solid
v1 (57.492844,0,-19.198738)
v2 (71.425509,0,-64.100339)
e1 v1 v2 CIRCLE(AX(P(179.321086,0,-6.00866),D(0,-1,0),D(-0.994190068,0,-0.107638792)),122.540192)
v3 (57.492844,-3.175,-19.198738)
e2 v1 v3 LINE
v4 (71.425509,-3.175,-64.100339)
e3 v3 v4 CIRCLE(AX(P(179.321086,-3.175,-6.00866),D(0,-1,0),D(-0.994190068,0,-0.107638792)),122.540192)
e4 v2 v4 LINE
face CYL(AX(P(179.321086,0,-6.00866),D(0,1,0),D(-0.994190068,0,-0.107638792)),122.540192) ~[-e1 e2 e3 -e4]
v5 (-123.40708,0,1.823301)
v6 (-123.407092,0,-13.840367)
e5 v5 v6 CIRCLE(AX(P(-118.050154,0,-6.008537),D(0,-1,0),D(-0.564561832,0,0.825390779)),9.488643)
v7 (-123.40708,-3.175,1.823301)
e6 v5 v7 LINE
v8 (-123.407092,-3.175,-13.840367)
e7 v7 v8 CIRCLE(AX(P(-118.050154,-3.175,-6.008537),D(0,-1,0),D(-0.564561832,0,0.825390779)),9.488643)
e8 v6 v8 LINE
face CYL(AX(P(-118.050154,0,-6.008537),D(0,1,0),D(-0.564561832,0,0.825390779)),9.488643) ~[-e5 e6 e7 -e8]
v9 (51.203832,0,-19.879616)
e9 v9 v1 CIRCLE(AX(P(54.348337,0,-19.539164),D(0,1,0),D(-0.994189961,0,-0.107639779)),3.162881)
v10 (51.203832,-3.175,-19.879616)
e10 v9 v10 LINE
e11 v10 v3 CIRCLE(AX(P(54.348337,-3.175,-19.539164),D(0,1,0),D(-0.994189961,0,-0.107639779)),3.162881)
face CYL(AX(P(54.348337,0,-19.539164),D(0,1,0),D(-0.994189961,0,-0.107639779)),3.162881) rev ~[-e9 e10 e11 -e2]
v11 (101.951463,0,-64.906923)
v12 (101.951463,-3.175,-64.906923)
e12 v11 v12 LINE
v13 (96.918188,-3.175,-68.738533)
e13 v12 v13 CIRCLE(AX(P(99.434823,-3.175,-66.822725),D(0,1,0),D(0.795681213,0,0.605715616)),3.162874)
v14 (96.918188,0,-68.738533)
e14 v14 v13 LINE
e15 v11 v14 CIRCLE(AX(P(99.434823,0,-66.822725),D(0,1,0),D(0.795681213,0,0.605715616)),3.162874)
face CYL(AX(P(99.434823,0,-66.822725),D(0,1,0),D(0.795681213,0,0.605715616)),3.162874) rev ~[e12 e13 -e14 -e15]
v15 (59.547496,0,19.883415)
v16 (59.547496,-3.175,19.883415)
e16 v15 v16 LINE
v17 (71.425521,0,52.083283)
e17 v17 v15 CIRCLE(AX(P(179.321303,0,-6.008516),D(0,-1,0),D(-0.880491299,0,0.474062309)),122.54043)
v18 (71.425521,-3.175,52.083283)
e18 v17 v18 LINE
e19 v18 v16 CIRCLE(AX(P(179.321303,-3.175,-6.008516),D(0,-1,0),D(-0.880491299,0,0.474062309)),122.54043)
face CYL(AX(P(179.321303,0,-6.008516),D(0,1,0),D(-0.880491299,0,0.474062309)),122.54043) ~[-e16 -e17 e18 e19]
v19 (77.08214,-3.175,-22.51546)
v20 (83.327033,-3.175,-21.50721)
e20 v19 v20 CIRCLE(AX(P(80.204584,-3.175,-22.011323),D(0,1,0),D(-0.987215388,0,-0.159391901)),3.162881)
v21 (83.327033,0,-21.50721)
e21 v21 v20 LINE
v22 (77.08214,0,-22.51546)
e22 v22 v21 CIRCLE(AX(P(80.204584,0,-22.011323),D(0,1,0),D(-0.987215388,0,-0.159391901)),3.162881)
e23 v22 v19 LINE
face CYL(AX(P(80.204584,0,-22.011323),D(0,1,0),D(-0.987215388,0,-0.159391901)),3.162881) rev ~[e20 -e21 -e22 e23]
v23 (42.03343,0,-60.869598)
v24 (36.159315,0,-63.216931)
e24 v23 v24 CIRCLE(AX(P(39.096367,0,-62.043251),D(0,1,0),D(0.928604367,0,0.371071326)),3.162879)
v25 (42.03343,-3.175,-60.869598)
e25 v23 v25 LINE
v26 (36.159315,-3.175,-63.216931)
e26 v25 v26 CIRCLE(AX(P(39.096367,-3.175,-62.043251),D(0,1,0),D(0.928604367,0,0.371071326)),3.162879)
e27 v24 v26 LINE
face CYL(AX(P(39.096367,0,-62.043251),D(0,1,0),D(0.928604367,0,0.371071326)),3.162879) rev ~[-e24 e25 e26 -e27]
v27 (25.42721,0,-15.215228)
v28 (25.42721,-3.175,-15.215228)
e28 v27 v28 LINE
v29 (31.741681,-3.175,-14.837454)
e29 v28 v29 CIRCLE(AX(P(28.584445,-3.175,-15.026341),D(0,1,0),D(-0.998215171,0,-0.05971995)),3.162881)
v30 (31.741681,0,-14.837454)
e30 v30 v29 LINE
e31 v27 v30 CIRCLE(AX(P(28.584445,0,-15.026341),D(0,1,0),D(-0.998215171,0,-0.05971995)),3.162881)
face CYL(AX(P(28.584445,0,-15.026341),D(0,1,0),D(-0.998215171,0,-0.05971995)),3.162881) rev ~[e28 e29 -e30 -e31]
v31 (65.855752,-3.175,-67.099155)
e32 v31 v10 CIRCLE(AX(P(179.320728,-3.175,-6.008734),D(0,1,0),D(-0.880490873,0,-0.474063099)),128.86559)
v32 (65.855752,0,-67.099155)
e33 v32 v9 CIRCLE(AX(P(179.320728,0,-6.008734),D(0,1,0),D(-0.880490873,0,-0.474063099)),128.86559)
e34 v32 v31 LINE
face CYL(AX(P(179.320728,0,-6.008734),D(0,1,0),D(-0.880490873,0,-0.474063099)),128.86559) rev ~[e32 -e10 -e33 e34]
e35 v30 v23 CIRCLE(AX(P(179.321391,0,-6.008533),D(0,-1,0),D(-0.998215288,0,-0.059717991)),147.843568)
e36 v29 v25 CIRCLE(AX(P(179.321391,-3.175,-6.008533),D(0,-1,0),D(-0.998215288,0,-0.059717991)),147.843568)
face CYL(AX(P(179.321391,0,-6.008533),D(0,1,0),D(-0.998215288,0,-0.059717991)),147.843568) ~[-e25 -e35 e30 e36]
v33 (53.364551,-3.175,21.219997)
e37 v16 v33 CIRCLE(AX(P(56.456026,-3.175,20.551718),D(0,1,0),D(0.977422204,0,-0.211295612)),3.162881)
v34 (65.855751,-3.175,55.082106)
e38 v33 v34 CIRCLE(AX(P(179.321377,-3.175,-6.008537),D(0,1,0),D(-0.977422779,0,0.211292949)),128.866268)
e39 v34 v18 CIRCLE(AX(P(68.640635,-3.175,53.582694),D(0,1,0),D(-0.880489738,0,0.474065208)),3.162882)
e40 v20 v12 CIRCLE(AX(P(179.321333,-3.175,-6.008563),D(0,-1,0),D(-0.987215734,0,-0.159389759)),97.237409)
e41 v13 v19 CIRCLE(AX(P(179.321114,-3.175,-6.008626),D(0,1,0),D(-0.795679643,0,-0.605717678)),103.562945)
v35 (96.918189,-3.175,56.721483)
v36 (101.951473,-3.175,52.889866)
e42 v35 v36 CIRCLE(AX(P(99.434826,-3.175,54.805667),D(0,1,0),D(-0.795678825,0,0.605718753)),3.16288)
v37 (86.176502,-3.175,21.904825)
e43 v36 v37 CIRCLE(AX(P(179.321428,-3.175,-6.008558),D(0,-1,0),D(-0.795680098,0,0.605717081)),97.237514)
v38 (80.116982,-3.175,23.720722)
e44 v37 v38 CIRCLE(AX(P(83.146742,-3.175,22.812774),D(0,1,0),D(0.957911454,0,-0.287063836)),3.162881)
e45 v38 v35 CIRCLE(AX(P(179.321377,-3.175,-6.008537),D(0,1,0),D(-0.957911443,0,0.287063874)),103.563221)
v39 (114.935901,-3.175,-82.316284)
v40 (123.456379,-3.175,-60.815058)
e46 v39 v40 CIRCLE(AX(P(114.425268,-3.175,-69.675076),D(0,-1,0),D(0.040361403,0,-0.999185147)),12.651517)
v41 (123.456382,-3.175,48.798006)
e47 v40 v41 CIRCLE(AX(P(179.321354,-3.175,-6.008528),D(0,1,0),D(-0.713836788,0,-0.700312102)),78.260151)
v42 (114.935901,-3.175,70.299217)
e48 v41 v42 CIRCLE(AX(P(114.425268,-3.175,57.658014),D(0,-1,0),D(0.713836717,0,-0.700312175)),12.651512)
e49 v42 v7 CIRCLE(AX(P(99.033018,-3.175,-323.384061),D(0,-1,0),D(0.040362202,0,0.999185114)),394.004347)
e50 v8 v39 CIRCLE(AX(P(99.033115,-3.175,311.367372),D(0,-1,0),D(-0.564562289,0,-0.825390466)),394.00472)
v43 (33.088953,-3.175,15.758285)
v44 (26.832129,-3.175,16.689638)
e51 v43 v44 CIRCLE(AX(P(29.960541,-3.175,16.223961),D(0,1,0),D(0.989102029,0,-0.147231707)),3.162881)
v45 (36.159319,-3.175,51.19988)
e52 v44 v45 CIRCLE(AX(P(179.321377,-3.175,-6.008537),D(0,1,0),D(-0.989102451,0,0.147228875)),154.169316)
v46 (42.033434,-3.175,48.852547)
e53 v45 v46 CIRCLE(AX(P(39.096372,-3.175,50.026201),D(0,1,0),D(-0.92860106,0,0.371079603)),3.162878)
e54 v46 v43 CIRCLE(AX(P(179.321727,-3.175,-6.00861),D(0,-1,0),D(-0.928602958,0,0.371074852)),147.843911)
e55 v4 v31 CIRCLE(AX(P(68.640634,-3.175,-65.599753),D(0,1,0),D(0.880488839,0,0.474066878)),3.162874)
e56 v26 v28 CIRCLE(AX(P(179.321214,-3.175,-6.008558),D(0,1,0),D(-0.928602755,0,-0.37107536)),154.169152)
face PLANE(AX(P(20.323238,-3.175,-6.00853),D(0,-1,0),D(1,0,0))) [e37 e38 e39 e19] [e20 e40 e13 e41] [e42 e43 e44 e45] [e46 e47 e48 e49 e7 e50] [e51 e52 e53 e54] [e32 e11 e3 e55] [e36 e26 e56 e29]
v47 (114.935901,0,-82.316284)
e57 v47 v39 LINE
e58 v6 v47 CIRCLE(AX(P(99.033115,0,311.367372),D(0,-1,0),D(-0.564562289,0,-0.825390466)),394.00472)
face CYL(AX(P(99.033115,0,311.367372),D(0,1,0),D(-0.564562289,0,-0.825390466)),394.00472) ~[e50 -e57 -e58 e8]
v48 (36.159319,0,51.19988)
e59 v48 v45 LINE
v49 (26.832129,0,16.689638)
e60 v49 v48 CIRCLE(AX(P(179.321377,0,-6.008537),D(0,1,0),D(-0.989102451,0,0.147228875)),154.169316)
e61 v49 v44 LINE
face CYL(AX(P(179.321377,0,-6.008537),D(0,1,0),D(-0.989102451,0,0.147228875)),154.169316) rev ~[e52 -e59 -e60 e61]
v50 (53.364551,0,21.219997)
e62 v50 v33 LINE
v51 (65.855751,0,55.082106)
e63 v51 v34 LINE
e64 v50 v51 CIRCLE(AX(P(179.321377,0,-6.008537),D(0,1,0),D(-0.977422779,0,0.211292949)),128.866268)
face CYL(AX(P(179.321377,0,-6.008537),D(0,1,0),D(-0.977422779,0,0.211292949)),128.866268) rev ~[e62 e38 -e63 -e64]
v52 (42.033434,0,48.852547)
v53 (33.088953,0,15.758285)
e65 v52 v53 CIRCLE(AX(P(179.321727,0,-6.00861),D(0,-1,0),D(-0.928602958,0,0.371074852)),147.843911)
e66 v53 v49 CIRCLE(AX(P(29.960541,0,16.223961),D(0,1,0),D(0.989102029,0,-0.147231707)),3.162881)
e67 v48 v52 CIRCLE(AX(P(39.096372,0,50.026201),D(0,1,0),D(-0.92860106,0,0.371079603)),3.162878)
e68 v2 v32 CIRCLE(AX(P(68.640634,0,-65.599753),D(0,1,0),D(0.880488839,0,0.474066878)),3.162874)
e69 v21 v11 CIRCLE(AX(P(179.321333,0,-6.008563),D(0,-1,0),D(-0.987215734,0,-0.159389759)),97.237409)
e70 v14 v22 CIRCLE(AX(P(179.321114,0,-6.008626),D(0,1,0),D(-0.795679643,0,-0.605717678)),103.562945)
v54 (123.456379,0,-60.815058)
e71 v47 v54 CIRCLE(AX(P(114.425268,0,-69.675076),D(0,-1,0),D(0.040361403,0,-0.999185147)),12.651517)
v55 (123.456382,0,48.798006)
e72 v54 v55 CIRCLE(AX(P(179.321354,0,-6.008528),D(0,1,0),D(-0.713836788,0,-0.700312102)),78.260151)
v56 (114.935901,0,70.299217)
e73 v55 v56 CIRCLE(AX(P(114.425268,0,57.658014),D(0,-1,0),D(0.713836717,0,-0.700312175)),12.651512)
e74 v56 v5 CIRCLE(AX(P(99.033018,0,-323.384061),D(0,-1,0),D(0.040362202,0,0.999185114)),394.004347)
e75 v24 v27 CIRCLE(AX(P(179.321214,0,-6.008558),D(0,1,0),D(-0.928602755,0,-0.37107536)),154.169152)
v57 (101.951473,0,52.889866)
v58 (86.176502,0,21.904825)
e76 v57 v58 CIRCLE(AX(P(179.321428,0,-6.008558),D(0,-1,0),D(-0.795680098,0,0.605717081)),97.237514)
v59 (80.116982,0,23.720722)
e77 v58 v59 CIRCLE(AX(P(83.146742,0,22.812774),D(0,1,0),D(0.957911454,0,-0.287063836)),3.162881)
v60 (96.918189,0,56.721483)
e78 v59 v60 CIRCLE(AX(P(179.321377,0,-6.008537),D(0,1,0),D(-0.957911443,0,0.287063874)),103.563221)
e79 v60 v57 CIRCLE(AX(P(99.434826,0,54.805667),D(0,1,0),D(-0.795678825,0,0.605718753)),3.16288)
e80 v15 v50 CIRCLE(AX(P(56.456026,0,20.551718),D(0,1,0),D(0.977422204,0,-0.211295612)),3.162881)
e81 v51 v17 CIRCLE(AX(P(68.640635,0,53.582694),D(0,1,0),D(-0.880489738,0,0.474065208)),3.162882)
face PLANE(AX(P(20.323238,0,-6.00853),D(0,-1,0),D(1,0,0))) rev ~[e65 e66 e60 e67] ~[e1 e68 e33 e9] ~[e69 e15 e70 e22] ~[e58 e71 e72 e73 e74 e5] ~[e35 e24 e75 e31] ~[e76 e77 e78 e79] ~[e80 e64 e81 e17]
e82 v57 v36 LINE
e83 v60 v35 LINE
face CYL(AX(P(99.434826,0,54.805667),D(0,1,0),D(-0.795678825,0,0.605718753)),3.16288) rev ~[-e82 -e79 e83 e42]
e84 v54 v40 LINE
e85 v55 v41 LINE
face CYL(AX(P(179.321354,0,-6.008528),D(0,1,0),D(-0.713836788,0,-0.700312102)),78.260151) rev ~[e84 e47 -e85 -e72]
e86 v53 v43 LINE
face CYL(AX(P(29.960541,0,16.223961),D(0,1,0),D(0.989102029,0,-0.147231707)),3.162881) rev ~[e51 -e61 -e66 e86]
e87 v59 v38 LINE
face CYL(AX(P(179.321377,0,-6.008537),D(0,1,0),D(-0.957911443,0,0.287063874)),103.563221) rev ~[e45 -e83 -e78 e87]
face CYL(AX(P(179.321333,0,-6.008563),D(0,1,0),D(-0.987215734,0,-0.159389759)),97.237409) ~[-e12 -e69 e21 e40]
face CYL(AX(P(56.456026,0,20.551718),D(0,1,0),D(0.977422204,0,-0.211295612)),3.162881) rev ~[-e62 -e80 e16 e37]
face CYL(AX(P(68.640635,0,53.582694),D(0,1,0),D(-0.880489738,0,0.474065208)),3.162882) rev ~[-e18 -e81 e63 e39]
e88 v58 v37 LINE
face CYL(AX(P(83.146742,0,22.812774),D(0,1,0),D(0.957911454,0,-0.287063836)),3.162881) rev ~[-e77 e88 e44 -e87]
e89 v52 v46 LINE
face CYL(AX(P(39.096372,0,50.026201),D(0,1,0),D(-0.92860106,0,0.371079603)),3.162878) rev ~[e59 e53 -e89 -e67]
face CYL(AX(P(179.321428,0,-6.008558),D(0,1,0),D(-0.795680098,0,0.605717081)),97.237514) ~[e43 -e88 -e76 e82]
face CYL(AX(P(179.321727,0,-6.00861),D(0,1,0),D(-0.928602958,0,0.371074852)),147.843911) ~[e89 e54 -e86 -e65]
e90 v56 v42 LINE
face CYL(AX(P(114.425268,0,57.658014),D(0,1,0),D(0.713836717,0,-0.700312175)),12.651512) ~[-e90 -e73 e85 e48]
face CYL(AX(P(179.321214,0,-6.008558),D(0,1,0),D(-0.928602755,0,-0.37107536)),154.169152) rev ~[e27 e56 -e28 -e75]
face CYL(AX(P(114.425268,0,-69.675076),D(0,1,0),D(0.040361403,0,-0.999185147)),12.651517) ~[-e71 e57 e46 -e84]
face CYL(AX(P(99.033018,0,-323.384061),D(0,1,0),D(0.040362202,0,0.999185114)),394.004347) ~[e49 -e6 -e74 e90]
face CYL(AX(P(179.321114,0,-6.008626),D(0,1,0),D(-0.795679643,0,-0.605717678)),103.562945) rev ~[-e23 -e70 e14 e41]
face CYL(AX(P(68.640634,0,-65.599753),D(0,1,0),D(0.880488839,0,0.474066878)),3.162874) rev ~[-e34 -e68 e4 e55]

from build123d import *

# Parameters (mm, degrees)
F1_DEPTH = 3.175


# Not quite as in the source:
# - ends of sketch curves that miss each other by under 0.0002 mm in the source are joined


with BuildPart() as f1:
    # F0 (on Front) → F1 (new body)
    with BuildSketch(Plane.XZ):
        with BuildLine():
            ThreePointArc((-123.4070797919, 1.8233010265), (-127.5387969828, -6.0085300089), (-123.4070915827, -13.8403672647))
            ThreePointArc((-123.4070915827, -13.8403672647), (-9.7633198011, -67.3185862363), (114.9359014402, -82.3162835053))
            ThreePointArc((114.9359014402, -82.3162835053), (126.1869378761, -74.3359779231), (123.456379114, -60.815058194))
            ThreePointArc((123.456379114, -60.815058194), (101.0612030172, -6.0085281204), (123.4563821883, 48.798006178))
            ThreePointArc((123.4563821883, 48.798006178), (126.1869343608, 62.3189124907), (114.9359007509, 70.2992174423))
            ThreePointArc((114.9359007509, 70.2992174423), (-9.7633198011, 55.3015372363), (-123.4070797919, 1.8233010265))
        make_face()
        with BuildLine():
            ThreePointArc((77.0821397385, -22.5154604101), (79.7004591586, -18.8888761314), (83.3270330978, -21.5072098724))
            ThreePointArc((83.3270330978, -21.5072098724), (89.9643653266, -44.3549576844), (101.9514625839, -64.9069229437))
            ThreePointArc((101.9514625839, -64.9069229437), (101.3506333254, -69.3393586044), (96.9181875419, -68.7385326678))
            ThreePointArc((96.9181875419, -68.7385326678), (84.1512609661, -46.8495678563), (77.0821397385, -22.5154604101))
        make_face(mode=Mode.SUBTRACT)
        with BuildLine():
            ThreePointArc((25.4272095012, -15.2152278243), (28.3955581041, -11.8691050411), (31.7416808873, -14.837453644))
            ThreePointArc((31.7416808873, -14.837453644), (35.0399400748, -38.2666108744), (42.033430024, -60.8695978255))
            ThreePointArc((42.033430024, -60.8695978255), (40.2700359641, -64.9803081743), (36.1593147519, -63.2169312407))
            ThreePointArc((36.1593147519, -63.2169312407), (28.8665917441, -39.6468400601), (25.4272095012, -15.2152278243))
        make_face(mode=Mode.SUBTRACT)
        with BuildLine():
            ThreePointArc((51.2038323174, -19.8796162989), (54.0078974535, -16.3946587115), (57.4928438898, -19.1987377064))
            ThreePointArc((57.4928438898, -19.1987377064), (62.2856351867, -42.3239729178), (71.4255090517, -64.1003387977))
            ThreePointArc((71.4255090517, -64.1003387977), (70.1400475431, -68.384628042), (65.855751892, -67.099154634))
            ThreePointArc((65.855751892, -67.099154634), (56.24403894, -44.1986400904), (51.2038323174, -19.8796162989))
        make_face(mode=Mode.SUBTRACT)
        with BuildLine():
            ThreePointArc((26.8321292417, 16.6896378099), (30.4920693109, 34.2160200507), (36.1593192267, 51.1998804526))
            ThreePointArc((36.1593192267, 51.1998804526), (40.2700359641, 52.9632591743), (42.0334342681, 48.8525471295))
            ThreePointArc((42.0334342681, 48.8525471295), (36.5987212677, 32.5655461507), (33.0889530651, 15.7582851057))
            ThreePointArc((33.0889530651, 15.7582851057), (29.4948750618, 13.0955480188), (26.8321292417, 16.6896378099))
        make_face(mode=Mode.SUBTRACT)
        with BuildLine():
            ThreePointArc((53.3645508696, 21.2199967221), (58.4187785321, 38.5905299983), (65.8557505543, 55.0821063543))
            ThreePointArc((65.8557505543, 55.0821063543), (70.1400475431, 56.367579042), (71.425520951, 52.0832833909))
            ThreePointArc((71.425520951, 52.0832833909), (64.3536192611, 36.4012543788), (59.5474961242, 19.8834151887))
            ThreePointArc((59.5474961242, 19.8834151887), (55.7877392052, 17.4602445799), (53.3645508696, 21.2199967221))
        make_face(mode=Mode.SUBTRACT)
        with BuildLine():
            ThreePointArc((80.1169824074, 23.7207222996), (87.030580802, 40.9781600378), (96.9181889515, 56.7214825948))
            ThreePointArc((96.9181889515, 56.7214825948), (101.3506333254, 57.3223096044), (101.9514733693, 52.8898657333))
            ThreePointArc((101.9514733693, 52.8898657333), (92.6678111275, 38.108160652), (86.1765020812, 21.9048248522))
            ThreePointArc((86.1765020812, 21.9048248522), (82.2387981181, 19.7830123613), (80.1169824074, 23.7207222996))
        make_face(mode=Mode.SUBTRACT)
    extrude(amount=F1_DEPTH)


solid = f1.part
